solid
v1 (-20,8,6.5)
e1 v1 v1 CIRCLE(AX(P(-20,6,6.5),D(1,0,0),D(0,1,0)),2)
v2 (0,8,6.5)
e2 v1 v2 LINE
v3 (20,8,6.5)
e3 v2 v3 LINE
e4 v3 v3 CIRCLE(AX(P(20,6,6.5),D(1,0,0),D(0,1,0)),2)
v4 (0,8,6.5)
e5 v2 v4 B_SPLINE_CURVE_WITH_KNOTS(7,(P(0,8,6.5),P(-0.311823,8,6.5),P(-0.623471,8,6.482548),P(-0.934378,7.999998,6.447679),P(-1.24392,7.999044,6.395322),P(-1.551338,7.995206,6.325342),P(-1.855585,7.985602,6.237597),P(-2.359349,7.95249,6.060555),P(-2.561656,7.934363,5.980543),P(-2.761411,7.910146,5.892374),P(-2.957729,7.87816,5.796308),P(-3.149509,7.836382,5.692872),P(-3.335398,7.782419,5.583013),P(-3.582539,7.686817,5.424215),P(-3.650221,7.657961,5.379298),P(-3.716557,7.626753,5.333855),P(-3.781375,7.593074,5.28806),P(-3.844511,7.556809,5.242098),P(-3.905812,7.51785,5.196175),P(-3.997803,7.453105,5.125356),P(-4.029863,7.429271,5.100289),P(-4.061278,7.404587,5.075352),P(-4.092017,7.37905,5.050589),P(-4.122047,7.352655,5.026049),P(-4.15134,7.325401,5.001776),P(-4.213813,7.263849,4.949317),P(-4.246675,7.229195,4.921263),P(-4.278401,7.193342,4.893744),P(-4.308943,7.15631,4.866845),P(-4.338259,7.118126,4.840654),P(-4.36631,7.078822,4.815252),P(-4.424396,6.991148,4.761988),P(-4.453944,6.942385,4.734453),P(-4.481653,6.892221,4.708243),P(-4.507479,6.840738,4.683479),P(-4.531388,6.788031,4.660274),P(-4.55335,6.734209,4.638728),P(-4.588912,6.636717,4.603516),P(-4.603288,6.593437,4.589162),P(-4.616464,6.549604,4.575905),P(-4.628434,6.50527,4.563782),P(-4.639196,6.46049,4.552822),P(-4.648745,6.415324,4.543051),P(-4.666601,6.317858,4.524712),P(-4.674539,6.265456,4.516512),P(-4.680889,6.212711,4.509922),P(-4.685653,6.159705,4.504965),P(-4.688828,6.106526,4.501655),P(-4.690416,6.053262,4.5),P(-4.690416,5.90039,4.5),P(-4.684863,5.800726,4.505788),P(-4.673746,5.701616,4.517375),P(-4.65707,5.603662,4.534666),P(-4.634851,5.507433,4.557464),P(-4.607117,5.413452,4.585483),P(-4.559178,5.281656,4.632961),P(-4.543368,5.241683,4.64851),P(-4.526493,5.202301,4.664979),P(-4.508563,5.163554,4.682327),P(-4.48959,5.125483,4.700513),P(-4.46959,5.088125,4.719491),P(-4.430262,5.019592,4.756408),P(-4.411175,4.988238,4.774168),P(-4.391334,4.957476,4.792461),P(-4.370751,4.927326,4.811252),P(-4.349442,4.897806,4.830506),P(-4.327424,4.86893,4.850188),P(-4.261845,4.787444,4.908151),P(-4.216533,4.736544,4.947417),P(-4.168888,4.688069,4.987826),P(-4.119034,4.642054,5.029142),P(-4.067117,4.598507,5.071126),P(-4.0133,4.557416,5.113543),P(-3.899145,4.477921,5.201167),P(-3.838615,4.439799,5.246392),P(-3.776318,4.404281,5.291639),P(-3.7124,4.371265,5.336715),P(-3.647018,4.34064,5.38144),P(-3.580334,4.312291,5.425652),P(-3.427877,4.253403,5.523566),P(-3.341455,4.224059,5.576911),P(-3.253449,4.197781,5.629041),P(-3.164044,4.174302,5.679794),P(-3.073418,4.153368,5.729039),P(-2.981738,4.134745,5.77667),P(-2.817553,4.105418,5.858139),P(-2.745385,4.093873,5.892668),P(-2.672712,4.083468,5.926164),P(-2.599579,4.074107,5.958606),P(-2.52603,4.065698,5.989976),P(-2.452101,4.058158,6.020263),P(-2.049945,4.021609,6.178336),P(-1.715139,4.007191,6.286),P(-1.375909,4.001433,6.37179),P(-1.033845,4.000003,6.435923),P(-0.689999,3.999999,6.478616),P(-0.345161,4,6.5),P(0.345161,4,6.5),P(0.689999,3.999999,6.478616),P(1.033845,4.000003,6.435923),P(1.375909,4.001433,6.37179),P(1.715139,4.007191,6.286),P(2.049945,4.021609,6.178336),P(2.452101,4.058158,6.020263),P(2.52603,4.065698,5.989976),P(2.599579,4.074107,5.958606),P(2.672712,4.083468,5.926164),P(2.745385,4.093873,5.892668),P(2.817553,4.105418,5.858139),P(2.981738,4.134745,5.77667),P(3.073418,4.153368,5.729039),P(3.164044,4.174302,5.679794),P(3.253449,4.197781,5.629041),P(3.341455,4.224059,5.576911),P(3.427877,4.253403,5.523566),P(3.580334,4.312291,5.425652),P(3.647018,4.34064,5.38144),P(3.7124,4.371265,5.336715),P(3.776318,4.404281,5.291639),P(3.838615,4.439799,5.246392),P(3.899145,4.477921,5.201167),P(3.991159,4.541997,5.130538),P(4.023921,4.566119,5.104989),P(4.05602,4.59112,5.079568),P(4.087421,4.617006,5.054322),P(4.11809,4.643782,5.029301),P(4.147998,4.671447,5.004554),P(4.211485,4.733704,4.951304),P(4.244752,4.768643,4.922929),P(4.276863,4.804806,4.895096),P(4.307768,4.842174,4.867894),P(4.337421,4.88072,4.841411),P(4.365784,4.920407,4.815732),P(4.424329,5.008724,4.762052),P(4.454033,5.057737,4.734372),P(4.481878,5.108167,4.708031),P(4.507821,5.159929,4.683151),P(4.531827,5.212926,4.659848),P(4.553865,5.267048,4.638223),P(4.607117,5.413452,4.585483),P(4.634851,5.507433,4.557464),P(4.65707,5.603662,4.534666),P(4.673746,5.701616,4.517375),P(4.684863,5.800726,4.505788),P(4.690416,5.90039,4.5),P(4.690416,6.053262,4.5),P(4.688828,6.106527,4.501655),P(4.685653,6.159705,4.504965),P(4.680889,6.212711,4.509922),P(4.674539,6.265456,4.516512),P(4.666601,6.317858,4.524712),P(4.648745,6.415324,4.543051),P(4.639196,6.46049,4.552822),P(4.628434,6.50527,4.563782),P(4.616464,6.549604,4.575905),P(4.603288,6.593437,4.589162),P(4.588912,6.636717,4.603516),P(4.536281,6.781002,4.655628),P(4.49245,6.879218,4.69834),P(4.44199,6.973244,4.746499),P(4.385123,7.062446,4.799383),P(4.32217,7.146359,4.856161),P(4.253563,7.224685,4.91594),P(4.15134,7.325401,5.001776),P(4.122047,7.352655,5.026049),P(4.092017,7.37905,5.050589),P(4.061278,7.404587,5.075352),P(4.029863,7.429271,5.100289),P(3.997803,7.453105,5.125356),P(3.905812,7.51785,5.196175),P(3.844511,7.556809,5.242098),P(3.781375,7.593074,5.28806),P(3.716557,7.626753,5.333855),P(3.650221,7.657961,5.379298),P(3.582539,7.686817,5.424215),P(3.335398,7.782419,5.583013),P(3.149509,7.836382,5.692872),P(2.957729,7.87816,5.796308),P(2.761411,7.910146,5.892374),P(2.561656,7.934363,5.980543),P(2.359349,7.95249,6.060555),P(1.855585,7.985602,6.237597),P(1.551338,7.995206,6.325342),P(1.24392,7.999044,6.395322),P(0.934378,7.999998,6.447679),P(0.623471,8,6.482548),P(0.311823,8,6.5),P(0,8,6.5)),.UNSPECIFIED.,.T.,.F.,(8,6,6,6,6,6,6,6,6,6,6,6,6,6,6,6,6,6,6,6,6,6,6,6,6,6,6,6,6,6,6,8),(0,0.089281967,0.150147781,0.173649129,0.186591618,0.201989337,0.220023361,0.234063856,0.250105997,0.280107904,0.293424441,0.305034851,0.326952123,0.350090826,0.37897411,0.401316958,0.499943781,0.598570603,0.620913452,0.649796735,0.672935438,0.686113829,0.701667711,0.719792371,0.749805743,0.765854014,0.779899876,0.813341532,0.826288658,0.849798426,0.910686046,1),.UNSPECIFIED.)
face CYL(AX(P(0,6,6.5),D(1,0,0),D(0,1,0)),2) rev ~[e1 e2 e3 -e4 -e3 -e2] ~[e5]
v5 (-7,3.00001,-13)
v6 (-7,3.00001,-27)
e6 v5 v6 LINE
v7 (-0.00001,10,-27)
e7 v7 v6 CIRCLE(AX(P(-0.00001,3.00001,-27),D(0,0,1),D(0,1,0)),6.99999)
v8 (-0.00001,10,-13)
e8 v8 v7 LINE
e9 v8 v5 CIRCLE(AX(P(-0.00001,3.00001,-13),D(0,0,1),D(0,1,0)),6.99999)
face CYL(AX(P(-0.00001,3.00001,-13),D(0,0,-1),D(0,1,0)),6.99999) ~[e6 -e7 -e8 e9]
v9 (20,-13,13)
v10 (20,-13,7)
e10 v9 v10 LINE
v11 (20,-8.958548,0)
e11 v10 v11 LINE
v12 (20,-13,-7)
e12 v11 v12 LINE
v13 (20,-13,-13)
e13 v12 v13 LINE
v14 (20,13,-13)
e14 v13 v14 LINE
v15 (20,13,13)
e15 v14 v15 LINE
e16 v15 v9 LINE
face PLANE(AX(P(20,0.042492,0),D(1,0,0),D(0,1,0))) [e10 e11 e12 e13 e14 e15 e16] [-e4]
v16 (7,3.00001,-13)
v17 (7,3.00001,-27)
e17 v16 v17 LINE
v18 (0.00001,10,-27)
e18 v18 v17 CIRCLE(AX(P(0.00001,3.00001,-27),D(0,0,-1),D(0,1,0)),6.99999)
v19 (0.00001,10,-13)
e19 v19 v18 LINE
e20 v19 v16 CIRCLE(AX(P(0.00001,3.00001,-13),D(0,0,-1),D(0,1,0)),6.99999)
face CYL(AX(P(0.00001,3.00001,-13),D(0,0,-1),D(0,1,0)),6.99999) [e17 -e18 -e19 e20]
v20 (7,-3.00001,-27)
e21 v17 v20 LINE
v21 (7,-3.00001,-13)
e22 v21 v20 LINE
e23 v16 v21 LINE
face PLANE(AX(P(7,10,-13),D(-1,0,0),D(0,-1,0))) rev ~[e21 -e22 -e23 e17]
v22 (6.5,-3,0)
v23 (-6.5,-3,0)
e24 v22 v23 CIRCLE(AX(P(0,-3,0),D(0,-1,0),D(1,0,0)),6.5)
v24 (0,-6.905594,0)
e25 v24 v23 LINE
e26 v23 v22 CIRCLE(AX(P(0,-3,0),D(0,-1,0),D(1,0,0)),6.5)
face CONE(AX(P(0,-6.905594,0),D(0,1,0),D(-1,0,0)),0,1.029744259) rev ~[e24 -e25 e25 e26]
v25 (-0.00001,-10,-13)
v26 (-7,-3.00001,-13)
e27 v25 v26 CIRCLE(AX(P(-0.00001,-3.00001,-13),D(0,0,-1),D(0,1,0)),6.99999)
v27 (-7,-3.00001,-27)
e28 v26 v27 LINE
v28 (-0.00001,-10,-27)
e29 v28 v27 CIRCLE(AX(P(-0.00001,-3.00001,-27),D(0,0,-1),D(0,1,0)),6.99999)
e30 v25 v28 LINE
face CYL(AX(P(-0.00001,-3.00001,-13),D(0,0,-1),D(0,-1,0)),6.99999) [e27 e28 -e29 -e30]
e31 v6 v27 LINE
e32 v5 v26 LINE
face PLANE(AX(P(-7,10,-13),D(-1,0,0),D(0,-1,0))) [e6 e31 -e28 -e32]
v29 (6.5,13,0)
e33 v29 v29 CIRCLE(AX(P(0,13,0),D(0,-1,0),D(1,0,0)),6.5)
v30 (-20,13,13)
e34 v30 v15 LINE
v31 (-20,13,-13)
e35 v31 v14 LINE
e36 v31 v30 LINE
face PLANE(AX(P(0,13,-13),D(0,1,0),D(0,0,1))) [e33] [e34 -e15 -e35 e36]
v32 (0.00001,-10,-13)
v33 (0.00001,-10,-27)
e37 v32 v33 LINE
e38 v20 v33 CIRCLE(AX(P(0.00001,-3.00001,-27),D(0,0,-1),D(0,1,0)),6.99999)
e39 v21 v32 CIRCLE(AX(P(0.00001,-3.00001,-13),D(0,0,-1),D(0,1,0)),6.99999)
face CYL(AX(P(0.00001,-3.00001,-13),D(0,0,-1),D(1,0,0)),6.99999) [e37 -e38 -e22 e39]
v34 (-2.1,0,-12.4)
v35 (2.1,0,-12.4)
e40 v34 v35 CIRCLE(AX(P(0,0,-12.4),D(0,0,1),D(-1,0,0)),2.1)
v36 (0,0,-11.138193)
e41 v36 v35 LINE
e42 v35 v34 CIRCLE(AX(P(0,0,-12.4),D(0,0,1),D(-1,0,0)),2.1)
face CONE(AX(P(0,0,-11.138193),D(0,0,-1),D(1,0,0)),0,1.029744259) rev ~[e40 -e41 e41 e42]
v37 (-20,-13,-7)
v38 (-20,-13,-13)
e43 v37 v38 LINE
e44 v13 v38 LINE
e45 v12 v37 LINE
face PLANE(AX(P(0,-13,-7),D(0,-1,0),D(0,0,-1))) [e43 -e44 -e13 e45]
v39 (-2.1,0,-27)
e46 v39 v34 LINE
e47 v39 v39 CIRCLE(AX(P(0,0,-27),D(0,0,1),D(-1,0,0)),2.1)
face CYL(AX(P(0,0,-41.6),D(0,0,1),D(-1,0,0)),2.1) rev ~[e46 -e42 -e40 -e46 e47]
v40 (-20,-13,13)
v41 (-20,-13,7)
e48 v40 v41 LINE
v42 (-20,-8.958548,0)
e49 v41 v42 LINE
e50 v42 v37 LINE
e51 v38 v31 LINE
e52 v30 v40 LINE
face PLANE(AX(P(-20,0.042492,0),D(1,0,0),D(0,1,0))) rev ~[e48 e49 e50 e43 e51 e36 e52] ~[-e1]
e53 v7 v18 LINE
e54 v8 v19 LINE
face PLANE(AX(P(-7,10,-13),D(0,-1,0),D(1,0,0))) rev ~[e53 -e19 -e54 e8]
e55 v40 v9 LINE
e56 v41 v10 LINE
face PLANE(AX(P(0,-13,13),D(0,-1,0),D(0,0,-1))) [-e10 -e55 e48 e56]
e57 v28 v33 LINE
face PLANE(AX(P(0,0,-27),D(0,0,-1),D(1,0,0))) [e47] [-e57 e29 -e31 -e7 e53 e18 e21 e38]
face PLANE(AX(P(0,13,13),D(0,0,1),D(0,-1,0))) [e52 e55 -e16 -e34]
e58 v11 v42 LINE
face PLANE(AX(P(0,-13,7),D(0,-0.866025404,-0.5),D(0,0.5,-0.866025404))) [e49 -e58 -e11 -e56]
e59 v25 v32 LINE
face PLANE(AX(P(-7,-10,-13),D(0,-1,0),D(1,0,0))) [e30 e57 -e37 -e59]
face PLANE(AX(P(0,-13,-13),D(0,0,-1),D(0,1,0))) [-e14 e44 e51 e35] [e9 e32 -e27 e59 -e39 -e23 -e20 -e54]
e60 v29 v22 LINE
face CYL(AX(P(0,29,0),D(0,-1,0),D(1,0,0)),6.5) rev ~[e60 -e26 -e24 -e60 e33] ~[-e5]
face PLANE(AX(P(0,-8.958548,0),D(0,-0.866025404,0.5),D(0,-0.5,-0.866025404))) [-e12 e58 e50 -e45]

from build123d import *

# Parameters (mm, degrees)
F1_DEPTH  = 20
F2_W      = 14
F2_H      = 20
F3_DEPTH  = 14
F4_R      = 6.99999
F6_D      = 13
F6_DEPTH  = 16
F6_TIP    = 3.9055940237
F7_R      = 2
F8_DEPTH  = 20
F10_D     = 4.2
F10_DEPTH = 14.6
F10_TIP   = 1.2618073


# Not quite as in the source:
# - a fillet or chamfer is up to 0.001 mm smaller than in the source, because OpenCascade refuses the exact size


with BuildPart() as f1:
    # F0 (on Right) → F1 (new body, symmetric)
    with BuildSketch(Plane.YZ):
        Polygon((-13, -13), (13, -13), (13, 13), (-13, 13), (-13, 7), (-8.9585481157, 0), (-13, -7), align=None)
    extrude(amount=F1_DEPTH, both=True)

    # F2 (on face) → F3 (join)
    with BuildSketch(Plane(origin=(0, 0, -13), x_dir=(1, 0, 0), z_dir=(0, 0, -1))):
        Rectangle(F2_W, F2_H)
    extrude(amount=F3_DEPTH)

    # F4 (radius 7 in the source; OpenCascade refuses exactly that, so slightly less here)
    f4_edges = [f1.edges().sort_by_distance(p)[0] for p in [
        (7, -10, -20),
        (-7, -10, -20),
        (7, 10, -20),
        (-7, 10, -20),
    ]]
    fillet(f4_edges, radius=F4_R)

    # F6
    with Locations(Plane(origin=(0, 13, 0), x_dir=(-1, 0, 0), z_dir=(0, 1, 0))):
        with Locations((0, 0)):
            Hole(F6_D / 2, depth=F6_DEPTH)
            with Locations((0, 0, -(F6_DEPTH + F6_TIP / 2))):  # 118° drill point
                Cone(0, F6_D / 2, F6_TIP, mode=Mode.SUBTRACT)

    # F7 (on Right) → F8 (cut, symmetric)
    with BuildSketch(Plane.YZ):
        with Locations((6, 6.5)):
            Circle(F7_R)
    extrude(amount=F8_DEPTH, both=True, mode=Mode.SUBTRACT)

    # F10
    with Locations(Plane(origin=(0, 0, -27), x_dir=(1, 0, 0), z_dir=(0, 0, -1))):
        with Locations((0, 0)):
            Hole(F10_D / 2, depth=F10_DEPTH)
            with Locations((0, 0, -(F10_DEPTH + F10_TIP / 2))):  # 118° drill point
                Cone(0, F10_D / 2, F10_TIP, mode=Mode.SUBTRACT)


solid = f1.part
